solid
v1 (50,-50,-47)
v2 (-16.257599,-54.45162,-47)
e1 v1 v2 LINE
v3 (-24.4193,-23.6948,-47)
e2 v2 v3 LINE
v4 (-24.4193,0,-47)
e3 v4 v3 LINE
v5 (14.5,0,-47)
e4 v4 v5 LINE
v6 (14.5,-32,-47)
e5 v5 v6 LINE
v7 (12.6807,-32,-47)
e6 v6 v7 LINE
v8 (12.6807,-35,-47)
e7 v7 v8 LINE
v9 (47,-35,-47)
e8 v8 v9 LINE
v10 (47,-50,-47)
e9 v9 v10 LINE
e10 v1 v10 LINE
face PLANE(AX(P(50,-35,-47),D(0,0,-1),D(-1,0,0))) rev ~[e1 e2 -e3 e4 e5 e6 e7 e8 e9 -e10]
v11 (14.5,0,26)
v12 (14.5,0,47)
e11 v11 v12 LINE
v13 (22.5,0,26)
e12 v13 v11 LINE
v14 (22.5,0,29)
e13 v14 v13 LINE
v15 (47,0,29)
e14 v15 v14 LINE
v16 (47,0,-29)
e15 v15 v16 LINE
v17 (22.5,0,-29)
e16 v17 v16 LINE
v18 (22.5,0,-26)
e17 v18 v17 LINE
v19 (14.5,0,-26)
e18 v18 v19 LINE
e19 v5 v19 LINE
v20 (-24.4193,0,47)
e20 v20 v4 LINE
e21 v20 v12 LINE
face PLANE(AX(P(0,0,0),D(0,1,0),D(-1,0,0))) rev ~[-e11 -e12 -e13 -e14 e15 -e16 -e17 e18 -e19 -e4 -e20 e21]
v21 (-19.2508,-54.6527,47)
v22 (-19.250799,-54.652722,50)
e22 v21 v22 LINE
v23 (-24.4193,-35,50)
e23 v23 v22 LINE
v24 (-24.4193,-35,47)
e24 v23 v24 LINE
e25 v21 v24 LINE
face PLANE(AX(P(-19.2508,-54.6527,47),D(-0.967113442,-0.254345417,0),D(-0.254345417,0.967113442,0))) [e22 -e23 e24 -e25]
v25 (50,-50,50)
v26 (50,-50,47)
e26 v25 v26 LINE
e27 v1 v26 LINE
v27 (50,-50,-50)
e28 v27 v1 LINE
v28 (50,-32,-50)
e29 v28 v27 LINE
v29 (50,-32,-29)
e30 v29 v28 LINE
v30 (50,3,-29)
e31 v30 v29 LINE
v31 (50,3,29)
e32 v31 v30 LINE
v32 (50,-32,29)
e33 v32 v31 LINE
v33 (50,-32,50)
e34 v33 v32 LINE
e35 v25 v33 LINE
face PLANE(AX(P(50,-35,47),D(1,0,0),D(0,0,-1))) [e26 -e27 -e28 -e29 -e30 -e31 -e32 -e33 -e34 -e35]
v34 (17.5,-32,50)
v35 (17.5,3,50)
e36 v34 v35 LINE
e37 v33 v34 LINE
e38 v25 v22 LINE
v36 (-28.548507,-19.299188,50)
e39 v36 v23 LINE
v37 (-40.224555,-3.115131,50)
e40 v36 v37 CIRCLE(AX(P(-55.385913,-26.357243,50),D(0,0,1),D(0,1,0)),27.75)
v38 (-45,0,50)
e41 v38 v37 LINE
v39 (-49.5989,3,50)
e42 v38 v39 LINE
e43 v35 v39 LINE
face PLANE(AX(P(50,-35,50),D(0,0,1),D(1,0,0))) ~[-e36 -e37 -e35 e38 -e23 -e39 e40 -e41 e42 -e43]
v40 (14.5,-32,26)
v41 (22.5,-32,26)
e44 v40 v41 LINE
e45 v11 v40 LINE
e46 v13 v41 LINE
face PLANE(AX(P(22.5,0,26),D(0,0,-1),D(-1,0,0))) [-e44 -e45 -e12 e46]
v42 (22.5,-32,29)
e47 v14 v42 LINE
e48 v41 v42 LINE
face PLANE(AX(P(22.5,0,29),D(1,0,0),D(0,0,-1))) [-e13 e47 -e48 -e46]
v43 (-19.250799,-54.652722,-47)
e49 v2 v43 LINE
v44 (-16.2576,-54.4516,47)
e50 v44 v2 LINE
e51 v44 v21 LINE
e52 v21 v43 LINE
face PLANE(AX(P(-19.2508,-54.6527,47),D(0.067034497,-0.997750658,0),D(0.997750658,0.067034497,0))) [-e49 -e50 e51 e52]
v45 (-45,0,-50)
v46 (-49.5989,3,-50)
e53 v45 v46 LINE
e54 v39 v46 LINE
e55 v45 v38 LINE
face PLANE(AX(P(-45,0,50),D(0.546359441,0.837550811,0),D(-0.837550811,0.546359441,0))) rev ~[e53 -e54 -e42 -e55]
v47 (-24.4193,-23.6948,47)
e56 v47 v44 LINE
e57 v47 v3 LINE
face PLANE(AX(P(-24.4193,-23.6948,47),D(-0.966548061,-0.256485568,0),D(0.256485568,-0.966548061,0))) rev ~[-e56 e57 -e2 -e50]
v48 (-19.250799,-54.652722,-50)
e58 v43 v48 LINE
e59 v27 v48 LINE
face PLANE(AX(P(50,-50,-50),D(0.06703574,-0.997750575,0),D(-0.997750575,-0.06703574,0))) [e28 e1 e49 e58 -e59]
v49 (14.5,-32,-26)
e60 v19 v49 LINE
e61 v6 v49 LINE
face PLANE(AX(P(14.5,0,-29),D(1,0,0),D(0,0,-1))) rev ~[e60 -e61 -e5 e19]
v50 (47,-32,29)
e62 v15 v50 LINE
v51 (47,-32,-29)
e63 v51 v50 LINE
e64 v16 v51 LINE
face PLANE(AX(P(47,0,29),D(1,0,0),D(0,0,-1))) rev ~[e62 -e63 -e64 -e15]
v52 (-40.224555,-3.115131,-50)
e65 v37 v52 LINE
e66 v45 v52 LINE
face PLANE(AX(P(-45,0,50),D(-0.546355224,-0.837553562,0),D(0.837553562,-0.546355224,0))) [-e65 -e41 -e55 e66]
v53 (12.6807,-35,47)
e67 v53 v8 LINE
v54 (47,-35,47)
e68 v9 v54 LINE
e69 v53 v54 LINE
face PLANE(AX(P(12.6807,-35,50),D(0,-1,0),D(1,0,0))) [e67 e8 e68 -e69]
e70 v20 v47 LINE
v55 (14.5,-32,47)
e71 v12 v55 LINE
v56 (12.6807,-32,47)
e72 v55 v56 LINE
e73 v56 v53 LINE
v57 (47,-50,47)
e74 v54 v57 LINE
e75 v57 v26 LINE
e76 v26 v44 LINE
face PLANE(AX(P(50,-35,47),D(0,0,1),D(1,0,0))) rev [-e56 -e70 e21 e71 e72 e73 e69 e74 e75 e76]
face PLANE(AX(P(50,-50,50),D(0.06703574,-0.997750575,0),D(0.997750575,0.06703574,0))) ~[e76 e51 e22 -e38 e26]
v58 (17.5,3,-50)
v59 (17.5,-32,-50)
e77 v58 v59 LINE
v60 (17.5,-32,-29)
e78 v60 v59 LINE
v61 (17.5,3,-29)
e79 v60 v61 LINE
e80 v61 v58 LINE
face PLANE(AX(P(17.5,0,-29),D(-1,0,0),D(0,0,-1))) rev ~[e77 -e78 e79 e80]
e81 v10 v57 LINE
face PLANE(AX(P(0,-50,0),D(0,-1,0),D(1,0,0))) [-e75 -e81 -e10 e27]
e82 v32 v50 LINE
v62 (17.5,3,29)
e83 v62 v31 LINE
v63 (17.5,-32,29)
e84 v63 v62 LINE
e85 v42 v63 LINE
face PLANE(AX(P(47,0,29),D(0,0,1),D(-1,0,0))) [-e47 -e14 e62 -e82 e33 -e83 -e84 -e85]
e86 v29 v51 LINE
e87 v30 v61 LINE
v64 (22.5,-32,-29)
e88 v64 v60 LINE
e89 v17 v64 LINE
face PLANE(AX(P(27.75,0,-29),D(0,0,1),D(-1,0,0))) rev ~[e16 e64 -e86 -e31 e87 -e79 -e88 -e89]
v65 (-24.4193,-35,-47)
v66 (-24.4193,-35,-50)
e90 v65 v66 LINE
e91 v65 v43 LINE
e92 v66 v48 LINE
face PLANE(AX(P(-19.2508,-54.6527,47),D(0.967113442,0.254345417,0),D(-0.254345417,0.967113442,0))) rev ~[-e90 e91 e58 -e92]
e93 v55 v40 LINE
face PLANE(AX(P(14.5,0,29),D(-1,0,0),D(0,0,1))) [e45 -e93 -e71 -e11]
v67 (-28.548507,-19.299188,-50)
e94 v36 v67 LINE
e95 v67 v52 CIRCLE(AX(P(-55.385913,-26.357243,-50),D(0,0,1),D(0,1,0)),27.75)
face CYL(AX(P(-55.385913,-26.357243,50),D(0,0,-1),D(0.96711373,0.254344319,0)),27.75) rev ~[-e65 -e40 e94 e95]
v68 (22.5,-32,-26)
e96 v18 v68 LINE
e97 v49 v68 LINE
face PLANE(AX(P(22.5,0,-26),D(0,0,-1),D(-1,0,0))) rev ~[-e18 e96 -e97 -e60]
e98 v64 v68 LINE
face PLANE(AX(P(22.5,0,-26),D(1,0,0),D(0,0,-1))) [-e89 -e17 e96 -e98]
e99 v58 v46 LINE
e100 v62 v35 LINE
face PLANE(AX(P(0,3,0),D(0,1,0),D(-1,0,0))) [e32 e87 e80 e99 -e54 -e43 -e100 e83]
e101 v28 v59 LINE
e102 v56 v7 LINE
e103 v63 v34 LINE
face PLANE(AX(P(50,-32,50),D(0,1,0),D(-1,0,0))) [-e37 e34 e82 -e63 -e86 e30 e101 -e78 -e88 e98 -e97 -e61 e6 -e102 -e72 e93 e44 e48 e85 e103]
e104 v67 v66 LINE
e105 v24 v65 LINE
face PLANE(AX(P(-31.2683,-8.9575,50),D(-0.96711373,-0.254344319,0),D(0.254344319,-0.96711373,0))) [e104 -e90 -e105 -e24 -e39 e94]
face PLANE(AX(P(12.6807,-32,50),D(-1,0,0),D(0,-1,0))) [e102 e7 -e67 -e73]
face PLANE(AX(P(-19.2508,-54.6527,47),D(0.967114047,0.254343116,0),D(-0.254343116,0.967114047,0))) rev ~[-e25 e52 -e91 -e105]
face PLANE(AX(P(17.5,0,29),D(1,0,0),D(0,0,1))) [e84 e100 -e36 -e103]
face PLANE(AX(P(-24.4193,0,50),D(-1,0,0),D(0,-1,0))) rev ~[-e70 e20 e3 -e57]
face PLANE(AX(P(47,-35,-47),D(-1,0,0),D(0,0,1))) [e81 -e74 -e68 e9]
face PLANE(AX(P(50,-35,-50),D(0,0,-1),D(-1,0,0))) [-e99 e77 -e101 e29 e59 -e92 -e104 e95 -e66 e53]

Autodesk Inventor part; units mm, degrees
ref_plane "YZ Plane" through (0, 0, 0) normal (1, 0, 0) x (0, 1, 0)
ref_plane "XZ Plane" through (0, 0, 0) normal (0, 1, 0) x (-1, 0, 0)
ref_plane "XY Plane" through (0, 0, 0) normal (0, 0, 1) x (1, 0, 0)
sketch "Esboço1" plane through (0, 0, 0) normal (0, 1, 0) x (-1, 0, 0)
  line L0 (50, 50) -> (-50, 50)
  line L1 (-50, 50) -> (-50, -50)
  line L2 (-50, -50) -> (50, -50)
  line L3 (50, -50) -> (50, 50)
  line L4 (-50, 3) -> (-50, -3)
  line L5 (-50, -3) -> (-50, -29)
  line L6 (-50, -29) -> (-50, -50)
  line L7 (-50, -29) -> (-17.5, -29)
  line L8 (-17.5, -29) -> (-17.5, -50)
  line L9 (-50, -50) -> (-50, 50)
  line L10 (-50, 29) -> (-17.5, 29)
  line L11 (-17.5, 29) -> (-17.5, 50)
  line L12 (24.4193, 35) -> (-9.5807, 35)
  line L13 (-9.5807, 35) -> (-9.5807, -35)
  line L14 (-9.5807, -35) -> (24.4193, -35)
  line L15 (24.4193, -35) -> (24.4193, 35)
  line L16 (-33.75, -29) -> (-39.75, -29)
  line L17 (-39.75, -29) -> (-39.75, -3)
  line L18 (-39.75, -3) -> (-33.75, -3)
  line L19 (-33.75, -3) -> (-27.75, -3)
  line L20 (-27.75, -3) -> (-27.75, -29)
  line L21 (-39.75, 29) -> (-39.75, 3)
  line L22 (-39.75, 3) -> (-33.75, 3)
  line L23 (-33.75, 3) -> (-27.75, 3)
  line L24 (-27.75, 3) -> (-27.75, 29)
  line L25 (50, -50) -> (45, -50)
  line L26 (45, -50) -> (45, 50)
  line L27 (45, 0) -> (42, 0)
  line L28 (-17.5, -29) -> (-14.5, -29)
  line L29 (-14.5, -29) -> (-14.5, -47)
  line L30 (-47, 29) -> (-47, -29)
  line L31 (54.9347, -47) -> (45, -47)
  line L32 (24.4193, -47) -> (-14.5, -47)
  line L33 (-17.5, 29) -> (-14.5, 29)
  line L34 (-14.5, 29) -> (-14.5, 47)
  line L35 (-47, -29) -> (-47, 29)
  line L36 (24.4193, 47) -> (-14.5, 47)
  line L37 (-50, 0) -> (-93.4603, 0)
  line L38 (-76.1073, 0) -> (-50, 0)
  line L39 (-47, 0) -> (56.946, 0)
  line L40 (24.4193, 50) -> (24.4193, -47)
  line L41 (93.4603, 0) -> (45, 0)
  line L42 (24.4193, 0) -> (-47, 0)
  line L43 (24.4193, -47) -> (24.4193, -50)
  line L44 (-17.5, 29) -> (-22.5, 29)
  line L45 (-22.5, 29) -> (-22.5, 26)
  line L46 (-22.5, 26) -> (-14.5, 26)
  line L47 (-14.5, 26) -> (-14.5, 29)
  line L48 (-14.5, -29) -> (-14.5, -26)
  line L49 (-17.5, -29) -> (-22.5, -29)
  line L50 (-22.5, -26) -> (-14.5, -26)
  line L51 (-22.5, -26) -> (-22.5, -29)
  point P0 (0, 0)
  point P1 (7.4193, 0)
  point P2 (42, 50)
  point P3 (-9.5807, 0)
  point P4 (42, -50)
  dimension "d0" = 100
  dimension "d1" = 100
  dimension "d2" = 6
  dimension "d3" = 26
  dimension "d4" = 21
  dimension "d5" = 32.5
  dimension "d6" = 34
  dimension "d10" = 26
  dimension "d12" = 10.25
  dimension "d13" = 67.5
  dimension "d14" = 5
  dimension "d17" = 58
  dimension "d18" = 15
  dimension "d23" = 12
  dimension "d24" = 5
  dimension "d25" = 3
  dimension "d26" = 3
extrude "Extrusão1" add sketch "Esboço1" along normal blind 3 contours L26 L27 L39 L15 L40 L0 | L40 L36 L34 L33 L11 L0 | L26 L2 L43 L40 L15 L39 L27 | L40 L12 L13 L39 L30 L10 L21 L22 L23 L24 L45 L46 L47 L34 L36 | L33 L47 L46 L45 L10 | L15 L39 L13 L12 | L15 L14 L13 L39 | L10 L30 L7 L1 | L2 L8 L28 L29 L32 L43 | L40 L32 L29 L48 L50 L51 L7 L20 L19 L18 L17 L30 L39 L13 L14 | L24 L23 L22 L21 L10 | L7 L51 L50 L48 L28 | L17 L18 L19 L20 L7
extrude "Extrusão2" add sketch "Esboço1" against normal blind 35 contours L40 L36 L34 L33 L11 L0 | L33 L47 L46 L45 L10 | L10 L30 L7 L1 | L2 L8 L28 L29 L32 L43 | L7 L51 L50 L48 L28
sketch "Esboço2" plane through (-45, 3, 50) normal (0, 0, 1) x (1, 0, 0)
  line L0 (0, -3) -> (0, 0) projected
  line L1 (0, -3) -> (13.7317, -11.9575)
  line L2 (0, -3) -> (-4.5989, 0)
  line L3 (-4.5989, 0) -> (0, 0)
  line L4 (20.5807, -3) -> (20.5807, -38) projected
  line L5 (13.7317, -11.9575) -> (20.5807, -38)
  line L6 (0, 0) -> (0, -3)
  line L7 (0, -3) -> (20.5807, -3) projected
  line L8 (0, -3) -> (20.5807, -3)
  line L9 (59.5, -3) -> (20.5807, -3) projected
  line L10 (20.5807, -3) -> (20.5807, -38)
  point P0 (45, -3)
extrude "Extrusão3" add sketch "Esboço2" against normal blind 100
sketch "Esboço5" plane through (17.5, -35, 50) normal (0, 0, 1) x (1, 0, 0)
  line L0 (-41.9193, 0) -> (0, 0) projected
  line L1 (-41.9193, 0) -> (-4.8193, 0)
  line L2 (32.5, 0) -> (32.5, 38) projected
  line L3 (-4.8193, 0) -> (32.5, 0)
  line L4 (32.5, 0) -> (32.5, 3)
  line L5 (32.5, 3) -> (-4.8193, 3)
  line L6 (-4.8193, 3) -> (-4.8193, 0)
  point P0 (-17.5, 35)
  dimension "d31" = 37.1
  dimension "d32" = 3
extrude "Extrusão4" cut sketch "Esboço5" against normal blind 100.25
extrude "Extrusão5" add sketch "Esboço5" against normal blind 100
sketch "Esboço6" plane through (50, -35, -50) normal (0, 0, -1) x (-1, 0, 0)
  line L0 (37.3193, 0) -> (74.4193, 0) projected
  line L1 (74.4193, 0) -> (81.2683, 26.0425) projected
  line L2 (74.4193, 0) -> (74.4193, -20)
  line L3 (74.4193, 0) -> (0, 0) projected
  line L4 (0, 0) -> (0, -15)
  line L5 (0, -15) -> (74.4193, -20)
  line L6 (74.4193, 0) -> (0, 0)
  point P0 (50, 35)
  dimension "d37" = 20
  dimension "d38" = 15
extrude "Extrusão6" add sketch "Esboço6" against normal blind 3
mirror "Espelhar1" about plane through (0, 0, 0) normal (0, 0, 1) of "Extrusão6"
sketch "Esboço7" plane through (0, -35, 0) normal (0, -1, 0) x (1, 0, 0)
  line L0 (50, -50) -> (50, -47) projected
  line L1 (50, -47) -> (47, -47)
  line L2 (-24.4193, -47) -> (50, -47) projected
  line L3 (47, -47) -> (47, 47)
  line L4 (-24.4193, 47) -> (50, 47) projected
  line L5 (47, 47) -> (50, 47)
  line L6 (50, 50) -> (50, 29) projected
  line L7 (50, 47) -> (50, -47)
  point P0 (0, 0)
  dimension "d41" = 3
extrude "Extrusão7" add sketch "Esboço7" along normal blind 15
sketch "Esboço8" plane through (14.5, 0, 47) normal (0, 0, -1) x (-1, 0, 0)
  line L0 (38.9193, -35) -> (38.9193, -55) projected
  line L1 (38.9193, -35) -> (35.9193, -35)
  line L2 (35.9193, -35) -> (35.9193, -54.7984)
  line L3 (38.9193, -55) -> (-35.5, -50) projected
  line L4 (35.9193, -54.7984) -> (38.9193, -55)
  line L5 (38.9193, -55) -> (38.9193, -35)
  line L6 (45.7683, -8.9575) -> (64.0989, 3) projected
  line L7 (38.9193, -35) -> (45.7683, -8.9575) projected
  line L8 (45.7683, -8.9575) -> (38.9193, -35)
  line L9 (33.7508, -54.6527) -> (44.0879, -15.3473)
  line L10 (33.7508, -54.6527) -> (38.9193, -55)
  line L11 (38.9193, -35) -> (38.9193, -55) projected
  line L12 (38.9193, 0) -> (38.9193, -35) projected
  line L13 (38.9193, -55) -> (38.9193, -35)
  point P0 (14.5, 0)
  dimension "d44" = 3
extrude "Extrusão8" cut sketch "Esboço8" along normal mid plane 260.75 contours L0 L3 L2 L9 | L2 L3 L9
sketch "Esboço9" plane through (14.5, 0, 47) normal (0, 0, -1) x (-1, 0, 0)
  line L0 (33.7508, -54.6527) -> (38.9193, -35) projected
  line L1 (33.7508, -54.6527) -> (30.7576, -54.4516)
  line L2 (33.7508, -54.6527) -> (-35.5, -50) projected
  line L3 (38.9193, -23.6948) -> (30.7576, -54.4516)
  line L4 (38.9193, -35) -> (38.9193, -23.6948)
  line L5 (38.9193, 0) -> (38.9193, -35) projected
  line L6 (38.9193, -35) -> (33.7508, -54.6527)
  line L7 (33.7508, -54.6527) -> (30.7576, -54.4516)
  point P0 (14.5, 0)
  dimension "d47" = 3
extrude "Extrusão9" add sketch "Esboço9" along normal blind 95.75
fillet "Arredondamento1" radius 27.75 1 edges at (-31.2683, -8.9575, 0)
properties part number "Peçams2"
